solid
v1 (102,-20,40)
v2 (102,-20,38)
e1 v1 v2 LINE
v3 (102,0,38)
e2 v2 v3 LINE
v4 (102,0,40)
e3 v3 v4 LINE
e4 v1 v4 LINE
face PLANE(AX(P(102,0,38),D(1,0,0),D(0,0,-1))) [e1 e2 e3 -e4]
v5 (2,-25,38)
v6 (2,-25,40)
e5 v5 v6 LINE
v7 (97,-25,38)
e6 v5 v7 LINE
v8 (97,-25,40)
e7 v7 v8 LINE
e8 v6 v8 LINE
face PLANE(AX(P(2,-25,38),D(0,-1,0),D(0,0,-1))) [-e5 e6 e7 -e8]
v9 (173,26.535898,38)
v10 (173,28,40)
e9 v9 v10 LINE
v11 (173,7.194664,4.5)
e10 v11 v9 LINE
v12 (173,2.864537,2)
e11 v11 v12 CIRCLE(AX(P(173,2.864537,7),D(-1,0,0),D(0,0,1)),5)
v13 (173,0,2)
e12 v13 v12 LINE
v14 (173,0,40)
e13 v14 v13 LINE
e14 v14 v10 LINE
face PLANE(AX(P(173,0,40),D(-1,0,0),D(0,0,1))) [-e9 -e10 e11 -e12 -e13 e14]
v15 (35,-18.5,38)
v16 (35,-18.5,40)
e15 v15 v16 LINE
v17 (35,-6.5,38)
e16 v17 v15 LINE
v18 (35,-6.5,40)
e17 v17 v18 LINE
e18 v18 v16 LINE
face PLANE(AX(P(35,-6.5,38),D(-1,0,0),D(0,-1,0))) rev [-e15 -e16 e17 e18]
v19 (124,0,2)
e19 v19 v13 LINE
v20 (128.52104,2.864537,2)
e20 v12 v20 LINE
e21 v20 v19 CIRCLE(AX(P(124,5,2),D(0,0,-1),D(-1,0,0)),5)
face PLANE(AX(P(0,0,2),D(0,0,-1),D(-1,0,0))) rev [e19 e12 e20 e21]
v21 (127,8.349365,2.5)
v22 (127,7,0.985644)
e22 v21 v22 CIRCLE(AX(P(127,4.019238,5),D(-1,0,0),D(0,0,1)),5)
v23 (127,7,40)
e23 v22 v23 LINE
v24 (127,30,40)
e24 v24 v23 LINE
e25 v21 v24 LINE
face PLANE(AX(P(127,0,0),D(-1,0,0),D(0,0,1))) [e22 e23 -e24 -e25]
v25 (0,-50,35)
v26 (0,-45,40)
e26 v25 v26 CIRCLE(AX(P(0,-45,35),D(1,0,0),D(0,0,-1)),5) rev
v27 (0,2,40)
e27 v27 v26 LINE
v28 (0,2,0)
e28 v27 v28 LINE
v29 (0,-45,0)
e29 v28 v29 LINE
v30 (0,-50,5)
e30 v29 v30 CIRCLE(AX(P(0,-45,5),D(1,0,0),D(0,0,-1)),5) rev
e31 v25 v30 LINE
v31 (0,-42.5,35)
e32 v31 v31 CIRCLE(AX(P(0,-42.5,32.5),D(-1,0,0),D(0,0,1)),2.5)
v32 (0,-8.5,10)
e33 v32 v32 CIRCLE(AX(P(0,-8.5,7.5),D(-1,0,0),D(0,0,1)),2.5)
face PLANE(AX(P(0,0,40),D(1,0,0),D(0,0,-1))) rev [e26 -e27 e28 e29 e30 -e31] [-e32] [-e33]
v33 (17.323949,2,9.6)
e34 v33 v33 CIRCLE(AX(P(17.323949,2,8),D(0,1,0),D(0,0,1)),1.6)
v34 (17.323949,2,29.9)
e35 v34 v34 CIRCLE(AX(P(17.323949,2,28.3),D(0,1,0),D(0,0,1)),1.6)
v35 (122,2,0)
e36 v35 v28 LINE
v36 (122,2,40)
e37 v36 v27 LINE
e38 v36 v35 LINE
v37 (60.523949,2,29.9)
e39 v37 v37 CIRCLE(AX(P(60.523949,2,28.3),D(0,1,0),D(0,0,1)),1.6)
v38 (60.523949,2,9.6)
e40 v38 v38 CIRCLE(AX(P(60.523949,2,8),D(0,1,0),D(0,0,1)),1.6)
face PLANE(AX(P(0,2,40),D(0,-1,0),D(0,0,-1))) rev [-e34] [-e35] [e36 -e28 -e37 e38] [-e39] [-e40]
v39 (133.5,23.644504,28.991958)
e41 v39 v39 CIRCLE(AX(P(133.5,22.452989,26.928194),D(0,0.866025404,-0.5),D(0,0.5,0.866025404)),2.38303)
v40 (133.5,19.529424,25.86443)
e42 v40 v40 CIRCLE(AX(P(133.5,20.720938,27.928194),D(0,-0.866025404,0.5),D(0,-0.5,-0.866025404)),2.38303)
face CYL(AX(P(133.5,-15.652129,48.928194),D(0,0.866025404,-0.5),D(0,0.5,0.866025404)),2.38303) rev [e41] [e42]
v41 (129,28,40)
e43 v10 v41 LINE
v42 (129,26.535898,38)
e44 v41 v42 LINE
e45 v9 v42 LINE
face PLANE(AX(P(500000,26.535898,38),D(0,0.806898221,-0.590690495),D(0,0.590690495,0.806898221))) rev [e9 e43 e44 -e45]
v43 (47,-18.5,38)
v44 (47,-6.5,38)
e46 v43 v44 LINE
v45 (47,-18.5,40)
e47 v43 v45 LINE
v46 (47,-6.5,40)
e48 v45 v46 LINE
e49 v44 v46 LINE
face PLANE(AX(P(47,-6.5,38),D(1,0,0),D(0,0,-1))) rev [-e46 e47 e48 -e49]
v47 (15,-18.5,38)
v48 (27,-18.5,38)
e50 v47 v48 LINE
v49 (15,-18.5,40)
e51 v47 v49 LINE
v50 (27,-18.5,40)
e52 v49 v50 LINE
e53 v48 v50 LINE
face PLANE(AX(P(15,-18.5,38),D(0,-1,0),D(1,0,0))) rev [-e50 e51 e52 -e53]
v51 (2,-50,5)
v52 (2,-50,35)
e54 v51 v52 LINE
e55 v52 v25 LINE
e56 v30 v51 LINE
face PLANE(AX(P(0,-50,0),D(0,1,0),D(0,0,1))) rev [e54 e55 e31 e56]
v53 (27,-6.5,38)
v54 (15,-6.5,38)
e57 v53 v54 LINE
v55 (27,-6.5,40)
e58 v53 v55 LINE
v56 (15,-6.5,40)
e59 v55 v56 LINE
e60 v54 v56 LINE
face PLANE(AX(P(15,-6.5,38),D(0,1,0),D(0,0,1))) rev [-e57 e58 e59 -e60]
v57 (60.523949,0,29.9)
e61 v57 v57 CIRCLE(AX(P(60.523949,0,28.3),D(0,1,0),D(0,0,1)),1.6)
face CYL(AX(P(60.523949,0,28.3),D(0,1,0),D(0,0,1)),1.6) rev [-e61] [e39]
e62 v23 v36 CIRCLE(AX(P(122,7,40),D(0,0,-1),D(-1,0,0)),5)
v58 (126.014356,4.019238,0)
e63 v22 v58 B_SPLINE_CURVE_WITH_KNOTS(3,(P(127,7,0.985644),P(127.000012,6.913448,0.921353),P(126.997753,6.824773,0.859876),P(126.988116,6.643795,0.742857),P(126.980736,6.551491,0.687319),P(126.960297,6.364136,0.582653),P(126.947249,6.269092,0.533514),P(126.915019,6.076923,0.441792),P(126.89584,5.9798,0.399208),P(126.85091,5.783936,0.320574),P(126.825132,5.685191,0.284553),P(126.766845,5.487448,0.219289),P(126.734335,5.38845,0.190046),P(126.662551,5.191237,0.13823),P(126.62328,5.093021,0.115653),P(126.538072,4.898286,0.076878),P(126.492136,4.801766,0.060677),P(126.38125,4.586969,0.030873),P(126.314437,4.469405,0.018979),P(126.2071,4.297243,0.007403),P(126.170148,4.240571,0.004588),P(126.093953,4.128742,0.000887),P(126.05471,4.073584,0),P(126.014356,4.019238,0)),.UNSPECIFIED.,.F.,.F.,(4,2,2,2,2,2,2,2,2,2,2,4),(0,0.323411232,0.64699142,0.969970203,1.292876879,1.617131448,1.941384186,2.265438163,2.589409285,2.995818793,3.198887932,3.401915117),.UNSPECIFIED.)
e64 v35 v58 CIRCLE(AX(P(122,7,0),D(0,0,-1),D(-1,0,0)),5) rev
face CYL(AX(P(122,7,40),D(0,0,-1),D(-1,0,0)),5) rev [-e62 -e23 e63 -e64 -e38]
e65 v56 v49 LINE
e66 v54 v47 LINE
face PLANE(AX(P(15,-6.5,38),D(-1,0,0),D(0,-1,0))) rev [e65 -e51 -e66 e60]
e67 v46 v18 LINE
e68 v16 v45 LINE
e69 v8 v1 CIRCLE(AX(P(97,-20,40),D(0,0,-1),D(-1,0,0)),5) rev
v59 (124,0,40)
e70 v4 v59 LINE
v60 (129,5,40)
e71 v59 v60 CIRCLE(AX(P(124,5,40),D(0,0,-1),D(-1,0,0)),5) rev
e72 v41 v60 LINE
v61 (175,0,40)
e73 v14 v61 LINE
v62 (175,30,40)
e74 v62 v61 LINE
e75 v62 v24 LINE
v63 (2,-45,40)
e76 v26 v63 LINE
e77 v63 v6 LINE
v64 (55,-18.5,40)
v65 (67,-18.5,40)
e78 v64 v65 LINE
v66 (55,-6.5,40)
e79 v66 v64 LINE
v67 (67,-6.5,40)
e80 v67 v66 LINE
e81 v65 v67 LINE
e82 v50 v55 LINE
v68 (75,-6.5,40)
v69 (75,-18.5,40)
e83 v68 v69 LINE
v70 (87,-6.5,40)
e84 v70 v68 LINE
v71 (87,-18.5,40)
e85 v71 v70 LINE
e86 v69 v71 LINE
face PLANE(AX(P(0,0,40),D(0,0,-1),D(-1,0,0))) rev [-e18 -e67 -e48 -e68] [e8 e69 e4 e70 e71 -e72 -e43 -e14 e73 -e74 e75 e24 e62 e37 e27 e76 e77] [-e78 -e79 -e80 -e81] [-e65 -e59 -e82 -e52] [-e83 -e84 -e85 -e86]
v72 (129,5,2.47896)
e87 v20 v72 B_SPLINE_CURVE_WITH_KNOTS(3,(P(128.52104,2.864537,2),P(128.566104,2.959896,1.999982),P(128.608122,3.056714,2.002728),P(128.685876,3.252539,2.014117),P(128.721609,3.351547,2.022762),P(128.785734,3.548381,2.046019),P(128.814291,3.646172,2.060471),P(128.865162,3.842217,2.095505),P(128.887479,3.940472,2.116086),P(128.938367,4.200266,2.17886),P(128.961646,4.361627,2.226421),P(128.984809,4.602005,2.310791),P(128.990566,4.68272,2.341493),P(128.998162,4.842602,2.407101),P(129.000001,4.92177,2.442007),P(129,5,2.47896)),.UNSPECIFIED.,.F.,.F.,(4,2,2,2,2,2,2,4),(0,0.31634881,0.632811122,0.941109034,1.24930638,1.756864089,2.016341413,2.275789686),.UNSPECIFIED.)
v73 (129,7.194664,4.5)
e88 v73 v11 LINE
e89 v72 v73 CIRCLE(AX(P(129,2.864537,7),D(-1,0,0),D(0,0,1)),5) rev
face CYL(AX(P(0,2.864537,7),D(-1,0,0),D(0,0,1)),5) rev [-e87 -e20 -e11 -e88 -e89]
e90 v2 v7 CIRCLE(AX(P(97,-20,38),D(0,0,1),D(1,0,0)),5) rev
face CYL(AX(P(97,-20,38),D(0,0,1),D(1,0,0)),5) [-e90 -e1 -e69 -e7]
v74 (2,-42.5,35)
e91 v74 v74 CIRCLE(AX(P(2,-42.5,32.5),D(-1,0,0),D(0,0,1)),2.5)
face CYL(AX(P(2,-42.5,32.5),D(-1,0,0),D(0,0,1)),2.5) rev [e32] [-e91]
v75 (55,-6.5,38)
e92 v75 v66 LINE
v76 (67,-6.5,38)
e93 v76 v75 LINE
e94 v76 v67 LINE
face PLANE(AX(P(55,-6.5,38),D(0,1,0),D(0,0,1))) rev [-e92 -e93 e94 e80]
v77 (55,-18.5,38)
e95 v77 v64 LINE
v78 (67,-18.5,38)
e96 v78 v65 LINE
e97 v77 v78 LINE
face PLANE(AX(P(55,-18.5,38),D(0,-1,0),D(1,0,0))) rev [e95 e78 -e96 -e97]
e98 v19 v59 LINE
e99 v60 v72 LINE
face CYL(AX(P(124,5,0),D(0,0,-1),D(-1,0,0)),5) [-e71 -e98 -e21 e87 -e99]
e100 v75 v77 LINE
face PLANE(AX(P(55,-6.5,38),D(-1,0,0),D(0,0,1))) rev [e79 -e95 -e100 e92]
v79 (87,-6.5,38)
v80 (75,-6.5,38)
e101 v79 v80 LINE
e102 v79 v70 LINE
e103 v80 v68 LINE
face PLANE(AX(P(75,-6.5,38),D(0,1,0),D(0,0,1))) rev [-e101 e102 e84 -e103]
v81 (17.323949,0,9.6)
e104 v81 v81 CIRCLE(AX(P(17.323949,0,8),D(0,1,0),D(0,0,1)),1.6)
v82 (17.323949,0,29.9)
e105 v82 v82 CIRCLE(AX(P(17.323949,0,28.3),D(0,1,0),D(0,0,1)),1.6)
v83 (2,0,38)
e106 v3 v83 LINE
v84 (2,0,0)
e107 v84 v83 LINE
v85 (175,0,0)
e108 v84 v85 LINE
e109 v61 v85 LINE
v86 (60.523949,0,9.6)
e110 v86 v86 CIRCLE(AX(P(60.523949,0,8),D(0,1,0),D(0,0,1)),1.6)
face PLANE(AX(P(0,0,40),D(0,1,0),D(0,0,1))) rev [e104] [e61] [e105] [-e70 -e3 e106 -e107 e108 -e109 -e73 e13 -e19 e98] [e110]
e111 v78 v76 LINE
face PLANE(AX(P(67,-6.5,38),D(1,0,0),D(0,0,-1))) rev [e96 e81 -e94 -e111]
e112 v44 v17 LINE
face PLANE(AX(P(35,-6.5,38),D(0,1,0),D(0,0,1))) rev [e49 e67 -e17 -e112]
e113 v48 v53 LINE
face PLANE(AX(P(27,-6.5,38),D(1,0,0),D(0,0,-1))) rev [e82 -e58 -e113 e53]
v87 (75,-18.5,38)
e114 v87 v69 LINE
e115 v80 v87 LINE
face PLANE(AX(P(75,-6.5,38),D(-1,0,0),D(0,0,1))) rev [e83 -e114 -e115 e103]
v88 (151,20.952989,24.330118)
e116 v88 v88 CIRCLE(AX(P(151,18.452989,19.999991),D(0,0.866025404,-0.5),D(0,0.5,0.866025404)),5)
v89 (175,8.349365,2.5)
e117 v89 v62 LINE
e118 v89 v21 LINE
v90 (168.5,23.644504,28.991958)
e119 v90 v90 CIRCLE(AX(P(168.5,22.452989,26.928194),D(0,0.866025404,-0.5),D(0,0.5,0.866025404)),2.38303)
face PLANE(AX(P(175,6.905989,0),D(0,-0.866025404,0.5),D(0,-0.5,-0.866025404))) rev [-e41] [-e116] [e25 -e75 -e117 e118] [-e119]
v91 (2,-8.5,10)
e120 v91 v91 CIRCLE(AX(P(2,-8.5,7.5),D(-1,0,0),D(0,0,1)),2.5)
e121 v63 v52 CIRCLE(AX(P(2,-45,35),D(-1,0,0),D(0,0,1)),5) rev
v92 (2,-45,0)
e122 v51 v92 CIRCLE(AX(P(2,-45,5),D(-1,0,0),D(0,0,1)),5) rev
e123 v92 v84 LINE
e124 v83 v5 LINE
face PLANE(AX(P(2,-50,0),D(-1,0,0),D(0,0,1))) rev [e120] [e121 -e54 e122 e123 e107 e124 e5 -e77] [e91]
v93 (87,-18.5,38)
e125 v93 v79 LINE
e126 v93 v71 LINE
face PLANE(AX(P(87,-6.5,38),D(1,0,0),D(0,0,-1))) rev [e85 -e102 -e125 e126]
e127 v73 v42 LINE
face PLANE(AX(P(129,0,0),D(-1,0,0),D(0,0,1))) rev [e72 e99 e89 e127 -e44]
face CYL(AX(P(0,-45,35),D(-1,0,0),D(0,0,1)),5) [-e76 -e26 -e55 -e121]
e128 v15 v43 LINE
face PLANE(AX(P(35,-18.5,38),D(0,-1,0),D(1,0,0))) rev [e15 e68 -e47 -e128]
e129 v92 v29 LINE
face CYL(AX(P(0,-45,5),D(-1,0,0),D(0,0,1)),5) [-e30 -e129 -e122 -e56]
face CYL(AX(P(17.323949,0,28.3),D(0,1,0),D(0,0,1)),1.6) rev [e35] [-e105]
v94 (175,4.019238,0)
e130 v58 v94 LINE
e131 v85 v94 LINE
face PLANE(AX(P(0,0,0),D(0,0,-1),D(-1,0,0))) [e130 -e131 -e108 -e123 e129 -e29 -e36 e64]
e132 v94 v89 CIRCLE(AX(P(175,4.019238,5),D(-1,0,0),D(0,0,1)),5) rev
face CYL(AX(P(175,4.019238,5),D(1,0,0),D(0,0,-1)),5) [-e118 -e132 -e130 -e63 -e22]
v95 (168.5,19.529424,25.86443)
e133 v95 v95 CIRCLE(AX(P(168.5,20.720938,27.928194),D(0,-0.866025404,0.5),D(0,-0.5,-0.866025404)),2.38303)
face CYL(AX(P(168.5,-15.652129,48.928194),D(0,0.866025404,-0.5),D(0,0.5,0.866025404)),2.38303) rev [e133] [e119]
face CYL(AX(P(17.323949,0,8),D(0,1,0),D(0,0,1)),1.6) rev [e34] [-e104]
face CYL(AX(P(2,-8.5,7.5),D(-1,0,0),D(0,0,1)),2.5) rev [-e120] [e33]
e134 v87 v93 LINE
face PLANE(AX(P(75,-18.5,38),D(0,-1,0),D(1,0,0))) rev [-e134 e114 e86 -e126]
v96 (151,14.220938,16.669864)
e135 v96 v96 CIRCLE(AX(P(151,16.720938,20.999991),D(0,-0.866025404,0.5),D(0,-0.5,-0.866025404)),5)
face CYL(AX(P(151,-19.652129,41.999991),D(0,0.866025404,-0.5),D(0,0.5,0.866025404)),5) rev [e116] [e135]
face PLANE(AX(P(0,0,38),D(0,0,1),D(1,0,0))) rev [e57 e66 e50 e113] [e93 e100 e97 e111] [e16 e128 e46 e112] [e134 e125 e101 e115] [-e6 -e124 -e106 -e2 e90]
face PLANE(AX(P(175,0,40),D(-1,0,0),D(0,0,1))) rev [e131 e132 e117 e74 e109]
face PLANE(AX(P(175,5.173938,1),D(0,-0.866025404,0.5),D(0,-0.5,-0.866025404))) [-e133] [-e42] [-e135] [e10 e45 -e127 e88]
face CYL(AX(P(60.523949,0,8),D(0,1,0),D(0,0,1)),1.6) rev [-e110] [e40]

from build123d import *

# Parameters (mm, degrees)
SKETCH1_W           = 175
SKETCH1_H           = 2
BOSS_EXTRUDE1_DEPTH = 40
SKETCH2_W           = 2
SKETCH2_H           = 40
BOSS_EXTRUDE2_DEPTH = 50
SKETCH3_W           = 100
SKETCH3_H           = 25
BOSS_EXTRUDE3_DEPTH = 2
SKETCH4_R           = 2.5
CUT_EXTRUDE1_DEPTH  = 2
SKETCH5_W           = 12
SKETCH5_H           = 12
CUT_EXTRUDE2_DEPTH  = 2
FILLET1_R           = 5
SKETCH6_R           = 1.6
CUT_EXTRUDE3_DEPTH  = 2
BOSS_EXTRUDE4_DEPTH = 48
SHELL1_DEPTH        = 5.751288694
SHELL1_START        = 4
SHELL1_2_DEPTH      = 1.751288694
SHELL1_START_2      = 129
SHELL1_3_DEPTH      = 44
SKETCH8_R           = 5
SKETCH8_R_2         = 2.383029524
CUT_EXTRUDE4_DEPTH  = 44
SKETCH10_W          = 44
SKETCH10_H          = 28
CUT_EXTRUDE5_DEPTH  = 2
BOSS_EXTRUDE5_REACH = 146.017
SKETCH12_W          = 5.470592624
SKETCH12_H          = 9.51694338
SKETCH12_W_2        = 4.594349632
SKETCH12_H_2        = 8.868192378
CUT_EXTRUDE6_DEPTH  = 188.459328922
SKETCH13_W          = 40
SKETCH13_H          = 2
BOSS_EXTRUDE6_DEPTH = 2
SKETCH14_W          = 3
SKETCH14_H          = 2
BOSS_EXTRUDE7_DEPTH = 2
FILLET3_R           = 5
FILLET4_R           = 5


with BuildPart() as part:
    # Sketch1 → Boss-Extrude1 (new body)
    with BuildSketch(Plane.XY):
        with Locations((87.5, 1)):
            Rectangle(SKETCH1_W, SKETCH1_H)
    extrude(amount=BOSS_EXTRUDE1_DEPTH)

    # Sketch2 → Boss-Extrude2 (add)
    with BuildSketch(Plane.XZ):
        with Locations((1, 20)):
            Rectangle(SKETCH2_W, SKETCH2_H)
    extrude(amount=BOSS_EXTRUDE2_DEPTH)

    # Sketch3 → Boss-Extrude3 (add)
    with BuildSketch(Plane.XY.offset(40)):
        with Locations((52, -12.5)):
            Rectangle(SKETCH3_W, SKETCH3_H)
    extrude(amount=-BOSS_EXTRUDE3_DEPTH)

    # Sketch4 → Cut-Extrude1 (cut)
    with BuildSketch(Plane.ZY):
        with Locations((7.5, -8.5)):
            Circle(SKETCH4_R)
        with Locations((32.5, -42.5)):
            Circle(SKETCH4_R)
    extrude(amount=-CUT_EXTRUDE1_DEPTH, mode=Mode.SUBTRACT)

    # Sketch5 → Cut-Extrude2 (cut)
    with BuildSketch(Plane.XY.offset(40)):
        with Locations((21, -12.5)):
            Rectangle(SKETCH5_W, SKETCH5_H)
        with Locations((41, -12.5)):
            Rectangle(SKETCH5_W, SKETCH5_H)
        with Locations((61, -12.5)):
            Rectangle(SKETCH5_W, SKETCH5_H)
        with Locations((81, -12.5)):
            Rectangle(SKETCH5_W, SKETCH5_H)
    extrude(amount=-CUT_EXTRUDE2_DEPTH, mode=Mode.SUBTRACT)

    # Fillet1
    fillet1_edges = [part.edges().sort_by_distance(p)[0] for p in [
        (175, 1, 40),
        (1, -50, 0),
        (1, -50, 40),
        (102, -25, 39),
        (175, 1, 0),
    ]]
    fillet(fillet1_edges, radius=FILLET1_R)

    # Sketch6 → Cut-Extrude3 (cut)
    with BuildSketch(Plane(origin=(0, 2, 0), x_dir=(1, 0, 0), z_dir=(0, 1, 0))):
        with Locations(Location((17.323948769, -8, 0), (0, 0, 270))):
            Circle(SKETCH6_R)
        with Locations(Location((60.523948769, -8, 0), (0, 0, 270))):
            Circle(SKETCH6_R)
        with Locations(Location((17.323948769, -28.3, 0), (0, 0, 270))):
            Circle(SKETCH6_R)
        with Locations(Location((60.523948769, -28.3, 0), (0, 0, 270))):
            Circle(SKETCH6_R)
    extrude(amount=-CUT_EXTRUDE3_DEPTH, mode=Mode.SUBTRACT)

    # Sketch7 → Boss-Extrude4 (add)
    with BuildSketch(Plane(origin=(127, 0, 0), x_dir=(0, 0, -1), z_dir=(1, 0, 0))):
        Polygon((0, 6.905989232), (-40, 30), (-40, 2), (0, 2), align=None)
    extrude(amount=BOSS_EXTRUDE4_DEPTH)

    # Shell1: read off the stored shape, not the designer's step
    # Shell1 outline → Shell1 (cut)
    with BuildSketch(Plane(origin=(0, 0, 0), x_dir=(1, 0, 0), z_dir=(0, 1, 0))):
        with BuildLine():
            Line((129, -38), (170, -38))
            ThreePointArc((170, -38), (172.121320344, -37.121320344), (173, -35))
            Line((173, -35), (173, -5))
            ThreePointArc((173, -5), (172.121320344, -2.878679656), (170, -2))
            Line((170, -2), (129, -2))
            Line((129, -2), (129, -38))
        make_face()
    extrude(amount=SHELL1_DEPTH, mode=Mode.SUBTRACT)

    # Shell1 2 outline → Shell1 2 (cut)
    with BuildSketch(Plane(origin=(0, 0, 0), x_dir=(1, 0, 0), z_dir=(0, 1, 0)).offset(SHELL1_START)):
        with BuildLine():
            Line((170, -38), (173, -38))
            Line((173, -38), (173, -35))
            ThreePointArc((173, -35), (172.121320344, -37.121320344), (170, -38))
        make_face()
        with BuildLine():
            ThreePointArc((170, -2), (172.121320344, -2.878679656), (173, -5))
            Line((173, -5), (173, -2))
            Line((173, -2), (170, -2))
        make_face()
    extrude(amount=SHELL1_2_DEPTH, mode=Mode.SUBTRACT)

    # Shell1 3 outline → Shell1 3 (cut)
    with BuildSketch(Plane.YZ.offset(SHELL1_START_2)):
        Polygon((26.535898385, 38), (5.751288694, 38), (5.751288694, 2), align=None)
    extrude(amount=SHELL1_3_DEPTH, mode=Mode.SUBTRACT)

    # Sketch8 → Cut-Extrude4 (cut)
    with BuildSketch(Plane(origin=(0, 5.179491924, -2.990381057), x_dir=(1, 0, 0), z_dir=(0, 0.8660254037844417, -0.49999999999999495))):
        with Locations(Location((151, -26.546994616, 0), (0, 0, 270))):
            Circle(SKETCH8_R)
        with Locations(Location((168.5, -34.546994616, 0), (0, 0, 270))):
            Circle(SKETCH8_R_2)
        with Locations(Location((133.5, -34.546994616, 0), (0, 0, 270))):
            Circle(SKETCH8_R_2)
    extrude(amount=-CUT_EXTRUDE4_DEPTH, mode=Mode.SUBTRACT)

    # Sketch10 → Cut-Extrude5 (cut)
    with BuildSketch(Plane.XY.offset(40)):
        with Locations((151, 14)):
            Rectangle(SKETCH10_W, SKETCH10_H)
    extrude(amount=-CUT_EXTRUDE5_DEPTH, mode=Mode.SUBTRACT)

    # Sketch11 → Boss-Extrude5 (add, up to next)
    with BuildSketch(Plane(origin=(129, 0, 0), x_dir=(0, 0, -1), z_dir=(1, 0, 0)), mode=Mode.PRIVATE) as boss_extrude5_sk1:
        Polygon((-38, 26.535898385), (-40, 28), (-38, 28), align=None)
    boss_extrude5_tool1 = extrude(boss_extrude5_sk1.sketch, amount=BOSS_EXTRUDE5_REACH, mode=Mode.PRIVATE) - part.part
    add(boss_extrude5_tool1.solids().sort_by_distance((129, 27.511966, 38.666667))[0])

    # Sketch12 → Cut-Extrude6 (cut, through all)
    with BuildSketch(Plane(origin=(0, 4, 0), x_dir=(1, 0, 0), z_dir=(0, 1, 0))):
        with Locations((170.264703688, -39.75847169)):
            Rectangle(SKETCH12_W, SKETCH12_H)
        with Locations((170.702825184, -6.434096189)):
            Rectangle(SKETCH12_W_2, SKETCH12_H_2)
    extrude(amount=-CUT_EXTRUDE6_DEPTH, mode=Mode.SUBTRACT)

    # Sketch13 → Boss-Extrude6 (add)
    with BuildSketch(Plane(origin=(175, 0, 0), x_dir=(0, 0, -1), z_dir=(1, 0, 0))):
        with Locations((-20, 1)):
            Rectangle(SKETCH13_W, SKETCH13_H)
    extrude(amount=-BOSS_EXTRUDE6_DEPTH)

    # Sketch14 → Boss-Extrude7 (add)
    with BuildSketch(Plane(origin=(0, 0, 0), x_dir=(-1, 0, 0), z_dir=(0, 0, -1))):
        with Locations((-171.5, 1)):
            Rectangle(SKETCH14_W, SKETCH14_H)
    extrude(amount=-BOSS_EXTRUDE7_DEPTH)

    # Fillet3
    fillet3_edges = [part.edges().sort_by_distance(p)[0] for p in [
        (129, 0, 21),
        (127, 2, 20),
    ]]
    fillet(fillet3_edges, radius=FILLET3_R)

    # Fillet4
    fillet4_edges = [part.edges().sort_by_distance(p)[0] for p in [
        (151, 5.751288694, 2),
        (150.99955806, 6.905989232, 0),
    ]]
    fillet(fillet4_edges, radius=FILLET4_R)


solid = part.part
